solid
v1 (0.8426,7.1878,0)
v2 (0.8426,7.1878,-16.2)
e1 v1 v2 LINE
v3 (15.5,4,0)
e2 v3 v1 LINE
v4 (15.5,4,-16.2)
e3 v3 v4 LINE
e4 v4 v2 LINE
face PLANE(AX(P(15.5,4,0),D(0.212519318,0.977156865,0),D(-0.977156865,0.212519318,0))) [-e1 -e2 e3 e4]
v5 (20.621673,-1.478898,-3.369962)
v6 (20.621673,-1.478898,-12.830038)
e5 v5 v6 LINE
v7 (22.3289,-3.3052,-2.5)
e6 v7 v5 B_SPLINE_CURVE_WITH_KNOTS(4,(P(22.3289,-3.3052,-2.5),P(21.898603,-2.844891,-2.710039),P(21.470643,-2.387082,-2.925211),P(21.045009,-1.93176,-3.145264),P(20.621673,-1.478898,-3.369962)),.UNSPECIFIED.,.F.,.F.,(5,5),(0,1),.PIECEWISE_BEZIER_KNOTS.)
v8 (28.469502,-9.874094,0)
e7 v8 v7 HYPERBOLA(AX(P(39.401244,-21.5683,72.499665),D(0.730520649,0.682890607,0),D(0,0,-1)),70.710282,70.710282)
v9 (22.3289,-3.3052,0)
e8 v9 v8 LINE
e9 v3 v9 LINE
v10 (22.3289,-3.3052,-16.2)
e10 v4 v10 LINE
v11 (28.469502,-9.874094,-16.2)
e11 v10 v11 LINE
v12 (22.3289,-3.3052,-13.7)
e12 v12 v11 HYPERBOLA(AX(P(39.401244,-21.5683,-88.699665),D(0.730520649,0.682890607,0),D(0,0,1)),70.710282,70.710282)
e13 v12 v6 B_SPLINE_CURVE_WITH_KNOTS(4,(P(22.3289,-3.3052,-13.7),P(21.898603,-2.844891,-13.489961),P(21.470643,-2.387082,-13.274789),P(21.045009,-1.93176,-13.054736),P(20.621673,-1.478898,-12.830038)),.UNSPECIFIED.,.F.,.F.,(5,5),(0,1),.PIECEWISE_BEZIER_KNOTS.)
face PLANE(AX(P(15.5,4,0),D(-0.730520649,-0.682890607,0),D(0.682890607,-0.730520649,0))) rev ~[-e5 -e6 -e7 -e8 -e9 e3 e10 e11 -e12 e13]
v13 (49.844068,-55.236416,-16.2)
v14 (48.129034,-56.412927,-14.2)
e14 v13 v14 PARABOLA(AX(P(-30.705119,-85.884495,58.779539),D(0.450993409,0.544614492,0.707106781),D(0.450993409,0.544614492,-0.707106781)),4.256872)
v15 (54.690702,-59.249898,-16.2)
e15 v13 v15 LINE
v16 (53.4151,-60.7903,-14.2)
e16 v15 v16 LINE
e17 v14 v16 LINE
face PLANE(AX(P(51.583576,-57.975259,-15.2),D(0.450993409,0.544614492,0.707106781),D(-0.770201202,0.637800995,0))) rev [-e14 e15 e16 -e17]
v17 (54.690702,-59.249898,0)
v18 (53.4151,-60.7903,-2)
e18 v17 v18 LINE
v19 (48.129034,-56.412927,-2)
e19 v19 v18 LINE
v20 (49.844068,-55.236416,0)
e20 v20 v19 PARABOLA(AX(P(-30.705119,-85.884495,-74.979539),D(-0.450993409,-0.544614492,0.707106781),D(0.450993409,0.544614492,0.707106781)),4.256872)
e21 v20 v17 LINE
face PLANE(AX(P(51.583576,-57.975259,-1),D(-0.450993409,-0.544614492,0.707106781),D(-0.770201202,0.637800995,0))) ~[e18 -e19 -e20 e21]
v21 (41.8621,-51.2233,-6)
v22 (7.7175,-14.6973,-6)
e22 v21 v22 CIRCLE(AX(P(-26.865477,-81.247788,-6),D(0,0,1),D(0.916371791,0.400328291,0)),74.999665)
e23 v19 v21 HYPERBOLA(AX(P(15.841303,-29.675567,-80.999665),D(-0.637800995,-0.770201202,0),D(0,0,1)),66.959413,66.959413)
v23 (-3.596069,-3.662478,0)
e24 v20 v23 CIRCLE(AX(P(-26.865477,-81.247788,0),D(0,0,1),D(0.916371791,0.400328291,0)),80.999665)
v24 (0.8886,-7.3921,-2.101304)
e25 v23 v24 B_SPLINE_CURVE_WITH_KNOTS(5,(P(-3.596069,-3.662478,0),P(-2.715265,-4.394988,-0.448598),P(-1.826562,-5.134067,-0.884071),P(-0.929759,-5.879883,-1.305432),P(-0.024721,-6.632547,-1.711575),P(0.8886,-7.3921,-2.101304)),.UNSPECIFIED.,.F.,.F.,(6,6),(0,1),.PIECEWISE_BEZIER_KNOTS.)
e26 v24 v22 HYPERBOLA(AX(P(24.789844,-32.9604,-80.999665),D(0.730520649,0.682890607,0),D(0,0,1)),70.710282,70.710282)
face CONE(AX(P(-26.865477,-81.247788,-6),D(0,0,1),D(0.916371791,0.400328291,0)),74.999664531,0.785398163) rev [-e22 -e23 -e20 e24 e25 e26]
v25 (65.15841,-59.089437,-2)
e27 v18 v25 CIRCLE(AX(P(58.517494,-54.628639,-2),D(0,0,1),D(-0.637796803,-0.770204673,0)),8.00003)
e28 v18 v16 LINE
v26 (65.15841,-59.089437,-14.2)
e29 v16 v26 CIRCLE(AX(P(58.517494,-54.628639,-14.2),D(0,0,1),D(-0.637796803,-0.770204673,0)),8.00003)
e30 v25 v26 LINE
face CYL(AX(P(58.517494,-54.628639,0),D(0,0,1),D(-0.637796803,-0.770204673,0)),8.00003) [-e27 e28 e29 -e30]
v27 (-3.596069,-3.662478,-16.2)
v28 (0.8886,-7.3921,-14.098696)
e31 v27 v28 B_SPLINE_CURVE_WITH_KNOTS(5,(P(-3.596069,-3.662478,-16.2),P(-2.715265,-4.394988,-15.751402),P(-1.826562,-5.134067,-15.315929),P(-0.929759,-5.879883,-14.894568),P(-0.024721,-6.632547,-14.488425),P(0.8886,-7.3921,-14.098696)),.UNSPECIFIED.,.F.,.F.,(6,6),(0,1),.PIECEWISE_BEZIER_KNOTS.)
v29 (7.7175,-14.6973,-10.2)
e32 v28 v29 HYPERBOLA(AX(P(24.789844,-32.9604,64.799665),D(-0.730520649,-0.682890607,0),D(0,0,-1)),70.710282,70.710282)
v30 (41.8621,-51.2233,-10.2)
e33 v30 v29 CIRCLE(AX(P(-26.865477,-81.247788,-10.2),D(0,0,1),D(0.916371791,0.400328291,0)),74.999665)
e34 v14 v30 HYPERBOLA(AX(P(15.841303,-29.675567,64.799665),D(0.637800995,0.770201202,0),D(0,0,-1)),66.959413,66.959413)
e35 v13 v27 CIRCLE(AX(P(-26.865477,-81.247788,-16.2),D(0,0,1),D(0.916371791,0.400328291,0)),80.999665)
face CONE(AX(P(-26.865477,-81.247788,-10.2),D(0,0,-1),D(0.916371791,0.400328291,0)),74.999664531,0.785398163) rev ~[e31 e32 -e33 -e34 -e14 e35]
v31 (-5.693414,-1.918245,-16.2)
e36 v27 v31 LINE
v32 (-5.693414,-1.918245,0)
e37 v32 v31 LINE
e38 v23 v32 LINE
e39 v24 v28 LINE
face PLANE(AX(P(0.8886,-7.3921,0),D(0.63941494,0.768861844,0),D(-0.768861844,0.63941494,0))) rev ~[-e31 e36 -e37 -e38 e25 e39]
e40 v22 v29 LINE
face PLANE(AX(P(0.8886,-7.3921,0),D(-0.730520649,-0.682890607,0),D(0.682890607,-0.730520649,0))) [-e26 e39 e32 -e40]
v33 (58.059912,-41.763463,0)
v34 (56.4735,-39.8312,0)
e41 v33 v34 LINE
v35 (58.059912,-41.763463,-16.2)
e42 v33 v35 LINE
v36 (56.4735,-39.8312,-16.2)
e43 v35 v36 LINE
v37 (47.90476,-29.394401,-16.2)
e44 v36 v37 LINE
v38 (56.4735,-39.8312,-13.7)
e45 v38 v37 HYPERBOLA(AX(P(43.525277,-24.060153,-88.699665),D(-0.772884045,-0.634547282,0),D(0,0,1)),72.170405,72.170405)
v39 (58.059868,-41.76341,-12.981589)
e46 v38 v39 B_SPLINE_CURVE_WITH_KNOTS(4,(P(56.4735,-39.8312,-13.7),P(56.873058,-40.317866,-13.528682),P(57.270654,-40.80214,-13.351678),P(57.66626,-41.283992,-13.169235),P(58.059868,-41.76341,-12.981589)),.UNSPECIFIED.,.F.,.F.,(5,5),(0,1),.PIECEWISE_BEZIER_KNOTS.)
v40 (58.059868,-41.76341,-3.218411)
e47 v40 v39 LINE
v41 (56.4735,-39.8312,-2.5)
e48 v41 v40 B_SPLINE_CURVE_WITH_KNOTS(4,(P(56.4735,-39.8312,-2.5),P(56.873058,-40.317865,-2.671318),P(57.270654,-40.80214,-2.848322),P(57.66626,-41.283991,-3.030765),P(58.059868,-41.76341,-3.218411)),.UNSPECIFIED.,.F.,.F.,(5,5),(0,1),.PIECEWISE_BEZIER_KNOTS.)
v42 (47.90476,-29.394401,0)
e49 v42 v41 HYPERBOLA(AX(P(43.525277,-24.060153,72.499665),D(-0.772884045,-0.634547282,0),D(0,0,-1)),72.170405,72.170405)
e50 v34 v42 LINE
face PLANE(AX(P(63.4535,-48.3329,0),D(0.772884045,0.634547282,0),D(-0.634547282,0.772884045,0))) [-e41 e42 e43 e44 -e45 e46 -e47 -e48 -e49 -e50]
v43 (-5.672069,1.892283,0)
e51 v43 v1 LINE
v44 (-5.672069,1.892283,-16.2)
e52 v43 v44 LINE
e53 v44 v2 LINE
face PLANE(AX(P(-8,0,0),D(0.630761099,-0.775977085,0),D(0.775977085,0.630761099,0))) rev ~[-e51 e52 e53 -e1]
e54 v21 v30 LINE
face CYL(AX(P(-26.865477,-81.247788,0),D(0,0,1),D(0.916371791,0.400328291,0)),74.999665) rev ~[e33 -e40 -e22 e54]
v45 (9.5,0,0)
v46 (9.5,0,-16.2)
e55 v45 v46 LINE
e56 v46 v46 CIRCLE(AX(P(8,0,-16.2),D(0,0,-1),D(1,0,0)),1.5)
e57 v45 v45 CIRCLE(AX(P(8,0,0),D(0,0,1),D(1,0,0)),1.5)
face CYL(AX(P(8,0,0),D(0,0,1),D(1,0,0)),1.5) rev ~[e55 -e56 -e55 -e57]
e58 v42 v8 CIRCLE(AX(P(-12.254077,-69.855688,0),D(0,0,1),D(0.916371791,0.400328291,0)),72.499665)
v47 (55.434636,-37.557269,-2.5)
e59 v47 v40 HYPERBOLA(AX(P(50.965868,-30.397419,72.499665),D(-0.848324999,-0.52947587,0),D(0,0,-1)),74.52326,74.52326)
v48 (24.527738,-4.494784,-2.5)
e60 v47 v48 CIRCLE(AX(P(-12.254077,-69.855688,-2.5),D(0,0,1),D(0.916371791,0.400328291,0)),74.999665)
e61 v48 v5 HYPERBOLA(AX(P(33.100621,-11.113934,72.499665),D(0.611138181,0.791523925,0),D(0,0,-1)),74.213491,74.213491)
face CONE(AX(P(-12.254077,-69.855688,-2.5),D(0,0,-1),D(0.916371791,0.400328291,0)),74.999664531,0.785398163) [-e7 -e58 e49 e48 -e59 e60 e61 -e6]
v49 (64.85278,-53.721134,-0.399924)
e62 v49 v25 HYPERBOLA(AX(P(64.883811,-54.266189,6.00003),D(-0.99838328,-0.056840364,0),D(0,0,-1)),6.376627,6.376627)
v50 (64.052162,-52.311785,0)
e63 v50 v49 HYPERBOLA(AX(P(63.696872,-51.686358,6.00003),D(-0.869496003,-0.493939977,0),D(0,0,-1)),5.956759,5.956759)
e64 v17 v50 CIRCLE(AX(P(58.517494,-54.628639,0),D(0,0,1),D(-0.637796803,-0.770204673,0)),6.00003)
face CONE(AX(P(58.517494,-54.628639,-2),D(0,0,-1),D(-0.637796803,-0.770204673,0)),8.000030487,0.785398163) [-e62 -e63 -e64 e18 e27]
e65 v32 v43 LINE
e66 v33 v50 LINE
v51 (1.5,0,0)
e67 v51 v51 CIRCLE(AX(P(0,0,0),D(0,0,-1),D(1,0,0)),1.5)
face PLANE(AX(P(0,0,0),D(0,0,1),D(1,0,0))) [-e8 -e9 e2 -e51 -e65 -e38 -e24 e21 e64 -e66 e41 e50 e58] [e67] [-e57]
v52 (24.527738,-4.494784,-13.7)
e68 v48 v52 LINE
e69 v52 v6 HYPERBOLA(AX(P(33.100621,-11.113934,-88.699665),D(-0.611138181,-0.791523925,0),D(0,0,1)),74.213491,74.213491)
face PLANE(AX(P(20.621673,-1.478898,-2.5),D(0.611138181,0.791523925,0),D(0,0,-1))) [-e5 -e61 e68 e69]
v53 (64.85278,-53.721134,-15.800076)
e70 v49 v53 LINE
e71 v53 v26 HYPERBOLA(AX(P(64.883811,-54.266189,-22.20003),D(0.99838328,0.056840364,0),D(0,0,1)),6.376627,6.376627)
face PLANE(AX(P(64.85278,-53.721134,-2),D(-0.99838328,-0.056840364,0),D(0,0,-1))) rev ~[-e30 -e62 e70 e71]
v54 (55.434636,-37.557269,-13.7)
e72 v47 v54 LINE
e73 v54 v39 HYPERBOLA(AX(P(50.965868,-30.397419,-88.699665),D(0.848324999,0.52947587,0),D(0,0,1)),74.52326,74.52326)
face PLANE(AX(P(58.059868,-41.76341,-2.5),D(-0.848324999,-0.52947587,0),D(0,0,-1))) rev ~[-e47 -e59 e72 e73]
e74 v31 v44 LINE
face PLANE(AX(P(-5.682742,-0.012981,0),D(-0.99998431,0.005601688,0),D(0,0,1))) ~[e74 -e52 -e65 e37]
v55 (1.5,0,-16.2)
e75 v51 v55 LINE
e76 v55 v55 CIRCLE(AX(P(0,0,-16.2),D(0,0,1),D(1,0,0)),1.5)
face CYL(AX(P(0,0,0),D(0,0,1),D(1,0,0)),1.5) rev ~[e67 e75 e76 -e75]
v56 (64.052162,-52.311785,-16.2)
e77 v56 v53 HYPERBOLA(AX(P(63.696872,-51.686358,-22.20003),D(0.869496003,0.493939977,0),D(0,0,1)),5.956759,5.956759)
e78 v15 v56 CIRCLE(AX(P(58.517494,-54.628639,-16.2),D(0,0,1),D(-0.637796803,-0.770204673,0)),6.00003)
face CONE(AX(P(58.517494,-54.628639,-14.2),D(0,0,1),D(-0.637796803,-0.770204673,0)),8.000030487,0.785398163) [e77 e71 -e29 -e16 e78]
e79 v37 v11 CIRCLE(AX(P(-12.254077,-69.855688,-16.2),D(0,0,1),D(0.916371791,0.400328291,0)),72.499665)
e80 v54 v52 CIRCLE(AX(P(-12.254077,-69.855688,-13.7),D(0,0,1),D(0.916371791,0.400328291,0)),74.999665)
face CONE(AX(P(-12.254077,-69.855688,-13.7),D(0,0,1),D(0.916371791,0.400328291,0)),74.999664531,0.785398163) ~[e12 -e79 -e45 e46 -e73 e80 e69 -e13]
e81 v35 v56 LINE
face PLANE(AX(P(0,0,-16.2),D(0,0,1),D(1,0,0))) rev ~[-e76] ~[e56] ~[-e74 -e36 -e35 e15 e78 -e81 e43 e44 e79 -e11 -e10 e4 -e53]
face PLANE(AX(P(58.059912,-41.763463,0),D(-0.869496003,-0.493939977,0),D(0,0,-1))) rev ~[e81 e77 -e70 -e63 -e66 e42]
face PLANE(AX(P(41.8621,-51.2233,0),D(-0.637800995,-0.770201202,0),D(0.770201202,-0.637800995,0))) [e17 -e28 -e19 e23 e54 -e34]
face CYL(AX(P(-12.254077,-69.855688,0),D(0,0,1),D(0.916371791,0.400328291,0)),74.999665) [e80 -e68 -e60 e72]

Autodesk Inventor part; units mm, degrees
ref_plane "YZ Plane" through (0, 0, 0) normal (1, 0, 0) x (0, 1, 0)
ref_plane "XZ Plane" through (0, 0, 0) normal (0, 1, 0) x (-1, 0, 0)
ref_plane "XY Plane" through (0, 0, 0) normal (0, 0, 1) x (1, 0, 0)
sketch "Sketch1" plane through (0, 0, 0) normal (0, 0, 1) x (1, 0, 0)
  circle A0 centre (0, 0) radius 1.5
  line L0 (0, 0) -> (8, 0)
  circle A1 centre (8, 0) radius 1.5
  line L1 (8, 0) -> (15.5, 0)
  line L2 (15.5, 0) -> (15.5, 4)
  line L3 (15.5, 0) -> (15.5, -4)
  line L4 (15.5, 4) -> (0.8426, 7.1878)
  line L5 (15.5, -4) -> (0.8886, -7.3921)
  line L6 (0, 0) -> (-8, 0)
  line L7 (0.8886, -7.3921) -> (-8, 0)
  line L8 (-8, 0) -> (0.8426, 7.1878)
  dimension "d0" = 3
  dimension "d1" = 8
  dimension "d2" = 3
  dimension "d3" = 7.5
  dimension "d4" = 4
  dimension "d5" = 4
  dimension "d6" = 102.27
  dimension "d7" = 103.07
  dimension "d8" = 15
  dimension "d9" = 15
  dimension "d10" = 8
extrude "Extrusion1" add sketch "Sketch1" against normal blind 16.2 contours L0 A1 L1 L3 L5 L7 L6 A0 | A0 L6 L8 L4 L2 L1 A1 L0
sketch "Sketch2" plane through (0, 0, 0) normal (0, 0, 1) x (1, 0, 0)
  line L0 (15.5, 4) -> (0.8426, 7.1878) projected
  line L1 (0.8426, 7.1878) -> (-8, 0) projected
  line L2 (-8, 0) -> (0.8886, -7.3921) projected
  line L3 (0.8886, -7.3921) -> (15.5, -4) projected
  line L4 (15.5, -4) -> (15.5, 4) projected
  circle A0 centre (8, 0) radius 1.5 projected
  circle A1 centre (0, 0) radius 1.5 projected
  line L5 (0.8886, -7.3921) -> (7.7175, -14.6973)
  line L6 (15.5, 4) -> (22.3289, -3.3052)
  arc A2 (41.8621, -51.2233) -> (7.7175, -14.6973) centre (-26.8658, -81.248) ccw
  arc A3 (56.4735, -39.8312) -> (22.3289, -3.3052) centre (-12.2544, -69.8559) ccw
  line L7 (41.8621, -51.2233) -> (53.4151, -60.7903)
  arc A4 (53.4151, -60.7903) -> (63.4535, -48.3329) centre (58.5175, -54.6287) ccw
  line L8 (63.4535, -48.3329) -> (56.4735, -39.8312)
  dimension "d13" = 10
  dimension "d14" = 60
  dimension "d15" = 10
  dimension "d17" = 50
  dimension "d18" = 75
  dimension "d19" = 50
  dimension "d20" = 75
  dimension "d29" = 15
  dimension "d30" = 11
  dimension "d31" = 8
  dimension "d32" = 141.656
extrude "Extrusion2" add sketch "Sketch2" against normal up to surface (16.2 mm away) contours L6 A3 L8 A4 L7 A2 L5 L3 L4
chamfer "Chamfer2" distance 6 angle 45 2 edges at (27.9232, -30.0312, 0) (27.9232, -30.0312, -16.2)
chamfer "Chamfer3" distance 2.5 angle 45 4 edges at (42.5346, -18.6391, -16.2) (42.5346, -18.6391, 0) (22.3289, -3.3052, -8.1) (56.4735, -39.8312, -8.1)
chamfer "Chamfer4" distance 8.5 angle 45 1 edges at (63.4535, -48.3329, -8.1)
chamfer "Chamfer5" distance 2 angle 45 4 edges at (61.1284, -62.1906, 0) (52.1804, -59.7678, 0) (61.1284, -62.1906, -16.2) (52.1804, -59.7678, -16.2)
chamfer "Chamfer6" distance 3 angle 45 1 edges at (66.3346, -56.3297, -8.1)
chamfer "Chamfer7" distance 3 angle 45 1 edges at (-8, 0, -8.1)
properties part number "Tarsus"
